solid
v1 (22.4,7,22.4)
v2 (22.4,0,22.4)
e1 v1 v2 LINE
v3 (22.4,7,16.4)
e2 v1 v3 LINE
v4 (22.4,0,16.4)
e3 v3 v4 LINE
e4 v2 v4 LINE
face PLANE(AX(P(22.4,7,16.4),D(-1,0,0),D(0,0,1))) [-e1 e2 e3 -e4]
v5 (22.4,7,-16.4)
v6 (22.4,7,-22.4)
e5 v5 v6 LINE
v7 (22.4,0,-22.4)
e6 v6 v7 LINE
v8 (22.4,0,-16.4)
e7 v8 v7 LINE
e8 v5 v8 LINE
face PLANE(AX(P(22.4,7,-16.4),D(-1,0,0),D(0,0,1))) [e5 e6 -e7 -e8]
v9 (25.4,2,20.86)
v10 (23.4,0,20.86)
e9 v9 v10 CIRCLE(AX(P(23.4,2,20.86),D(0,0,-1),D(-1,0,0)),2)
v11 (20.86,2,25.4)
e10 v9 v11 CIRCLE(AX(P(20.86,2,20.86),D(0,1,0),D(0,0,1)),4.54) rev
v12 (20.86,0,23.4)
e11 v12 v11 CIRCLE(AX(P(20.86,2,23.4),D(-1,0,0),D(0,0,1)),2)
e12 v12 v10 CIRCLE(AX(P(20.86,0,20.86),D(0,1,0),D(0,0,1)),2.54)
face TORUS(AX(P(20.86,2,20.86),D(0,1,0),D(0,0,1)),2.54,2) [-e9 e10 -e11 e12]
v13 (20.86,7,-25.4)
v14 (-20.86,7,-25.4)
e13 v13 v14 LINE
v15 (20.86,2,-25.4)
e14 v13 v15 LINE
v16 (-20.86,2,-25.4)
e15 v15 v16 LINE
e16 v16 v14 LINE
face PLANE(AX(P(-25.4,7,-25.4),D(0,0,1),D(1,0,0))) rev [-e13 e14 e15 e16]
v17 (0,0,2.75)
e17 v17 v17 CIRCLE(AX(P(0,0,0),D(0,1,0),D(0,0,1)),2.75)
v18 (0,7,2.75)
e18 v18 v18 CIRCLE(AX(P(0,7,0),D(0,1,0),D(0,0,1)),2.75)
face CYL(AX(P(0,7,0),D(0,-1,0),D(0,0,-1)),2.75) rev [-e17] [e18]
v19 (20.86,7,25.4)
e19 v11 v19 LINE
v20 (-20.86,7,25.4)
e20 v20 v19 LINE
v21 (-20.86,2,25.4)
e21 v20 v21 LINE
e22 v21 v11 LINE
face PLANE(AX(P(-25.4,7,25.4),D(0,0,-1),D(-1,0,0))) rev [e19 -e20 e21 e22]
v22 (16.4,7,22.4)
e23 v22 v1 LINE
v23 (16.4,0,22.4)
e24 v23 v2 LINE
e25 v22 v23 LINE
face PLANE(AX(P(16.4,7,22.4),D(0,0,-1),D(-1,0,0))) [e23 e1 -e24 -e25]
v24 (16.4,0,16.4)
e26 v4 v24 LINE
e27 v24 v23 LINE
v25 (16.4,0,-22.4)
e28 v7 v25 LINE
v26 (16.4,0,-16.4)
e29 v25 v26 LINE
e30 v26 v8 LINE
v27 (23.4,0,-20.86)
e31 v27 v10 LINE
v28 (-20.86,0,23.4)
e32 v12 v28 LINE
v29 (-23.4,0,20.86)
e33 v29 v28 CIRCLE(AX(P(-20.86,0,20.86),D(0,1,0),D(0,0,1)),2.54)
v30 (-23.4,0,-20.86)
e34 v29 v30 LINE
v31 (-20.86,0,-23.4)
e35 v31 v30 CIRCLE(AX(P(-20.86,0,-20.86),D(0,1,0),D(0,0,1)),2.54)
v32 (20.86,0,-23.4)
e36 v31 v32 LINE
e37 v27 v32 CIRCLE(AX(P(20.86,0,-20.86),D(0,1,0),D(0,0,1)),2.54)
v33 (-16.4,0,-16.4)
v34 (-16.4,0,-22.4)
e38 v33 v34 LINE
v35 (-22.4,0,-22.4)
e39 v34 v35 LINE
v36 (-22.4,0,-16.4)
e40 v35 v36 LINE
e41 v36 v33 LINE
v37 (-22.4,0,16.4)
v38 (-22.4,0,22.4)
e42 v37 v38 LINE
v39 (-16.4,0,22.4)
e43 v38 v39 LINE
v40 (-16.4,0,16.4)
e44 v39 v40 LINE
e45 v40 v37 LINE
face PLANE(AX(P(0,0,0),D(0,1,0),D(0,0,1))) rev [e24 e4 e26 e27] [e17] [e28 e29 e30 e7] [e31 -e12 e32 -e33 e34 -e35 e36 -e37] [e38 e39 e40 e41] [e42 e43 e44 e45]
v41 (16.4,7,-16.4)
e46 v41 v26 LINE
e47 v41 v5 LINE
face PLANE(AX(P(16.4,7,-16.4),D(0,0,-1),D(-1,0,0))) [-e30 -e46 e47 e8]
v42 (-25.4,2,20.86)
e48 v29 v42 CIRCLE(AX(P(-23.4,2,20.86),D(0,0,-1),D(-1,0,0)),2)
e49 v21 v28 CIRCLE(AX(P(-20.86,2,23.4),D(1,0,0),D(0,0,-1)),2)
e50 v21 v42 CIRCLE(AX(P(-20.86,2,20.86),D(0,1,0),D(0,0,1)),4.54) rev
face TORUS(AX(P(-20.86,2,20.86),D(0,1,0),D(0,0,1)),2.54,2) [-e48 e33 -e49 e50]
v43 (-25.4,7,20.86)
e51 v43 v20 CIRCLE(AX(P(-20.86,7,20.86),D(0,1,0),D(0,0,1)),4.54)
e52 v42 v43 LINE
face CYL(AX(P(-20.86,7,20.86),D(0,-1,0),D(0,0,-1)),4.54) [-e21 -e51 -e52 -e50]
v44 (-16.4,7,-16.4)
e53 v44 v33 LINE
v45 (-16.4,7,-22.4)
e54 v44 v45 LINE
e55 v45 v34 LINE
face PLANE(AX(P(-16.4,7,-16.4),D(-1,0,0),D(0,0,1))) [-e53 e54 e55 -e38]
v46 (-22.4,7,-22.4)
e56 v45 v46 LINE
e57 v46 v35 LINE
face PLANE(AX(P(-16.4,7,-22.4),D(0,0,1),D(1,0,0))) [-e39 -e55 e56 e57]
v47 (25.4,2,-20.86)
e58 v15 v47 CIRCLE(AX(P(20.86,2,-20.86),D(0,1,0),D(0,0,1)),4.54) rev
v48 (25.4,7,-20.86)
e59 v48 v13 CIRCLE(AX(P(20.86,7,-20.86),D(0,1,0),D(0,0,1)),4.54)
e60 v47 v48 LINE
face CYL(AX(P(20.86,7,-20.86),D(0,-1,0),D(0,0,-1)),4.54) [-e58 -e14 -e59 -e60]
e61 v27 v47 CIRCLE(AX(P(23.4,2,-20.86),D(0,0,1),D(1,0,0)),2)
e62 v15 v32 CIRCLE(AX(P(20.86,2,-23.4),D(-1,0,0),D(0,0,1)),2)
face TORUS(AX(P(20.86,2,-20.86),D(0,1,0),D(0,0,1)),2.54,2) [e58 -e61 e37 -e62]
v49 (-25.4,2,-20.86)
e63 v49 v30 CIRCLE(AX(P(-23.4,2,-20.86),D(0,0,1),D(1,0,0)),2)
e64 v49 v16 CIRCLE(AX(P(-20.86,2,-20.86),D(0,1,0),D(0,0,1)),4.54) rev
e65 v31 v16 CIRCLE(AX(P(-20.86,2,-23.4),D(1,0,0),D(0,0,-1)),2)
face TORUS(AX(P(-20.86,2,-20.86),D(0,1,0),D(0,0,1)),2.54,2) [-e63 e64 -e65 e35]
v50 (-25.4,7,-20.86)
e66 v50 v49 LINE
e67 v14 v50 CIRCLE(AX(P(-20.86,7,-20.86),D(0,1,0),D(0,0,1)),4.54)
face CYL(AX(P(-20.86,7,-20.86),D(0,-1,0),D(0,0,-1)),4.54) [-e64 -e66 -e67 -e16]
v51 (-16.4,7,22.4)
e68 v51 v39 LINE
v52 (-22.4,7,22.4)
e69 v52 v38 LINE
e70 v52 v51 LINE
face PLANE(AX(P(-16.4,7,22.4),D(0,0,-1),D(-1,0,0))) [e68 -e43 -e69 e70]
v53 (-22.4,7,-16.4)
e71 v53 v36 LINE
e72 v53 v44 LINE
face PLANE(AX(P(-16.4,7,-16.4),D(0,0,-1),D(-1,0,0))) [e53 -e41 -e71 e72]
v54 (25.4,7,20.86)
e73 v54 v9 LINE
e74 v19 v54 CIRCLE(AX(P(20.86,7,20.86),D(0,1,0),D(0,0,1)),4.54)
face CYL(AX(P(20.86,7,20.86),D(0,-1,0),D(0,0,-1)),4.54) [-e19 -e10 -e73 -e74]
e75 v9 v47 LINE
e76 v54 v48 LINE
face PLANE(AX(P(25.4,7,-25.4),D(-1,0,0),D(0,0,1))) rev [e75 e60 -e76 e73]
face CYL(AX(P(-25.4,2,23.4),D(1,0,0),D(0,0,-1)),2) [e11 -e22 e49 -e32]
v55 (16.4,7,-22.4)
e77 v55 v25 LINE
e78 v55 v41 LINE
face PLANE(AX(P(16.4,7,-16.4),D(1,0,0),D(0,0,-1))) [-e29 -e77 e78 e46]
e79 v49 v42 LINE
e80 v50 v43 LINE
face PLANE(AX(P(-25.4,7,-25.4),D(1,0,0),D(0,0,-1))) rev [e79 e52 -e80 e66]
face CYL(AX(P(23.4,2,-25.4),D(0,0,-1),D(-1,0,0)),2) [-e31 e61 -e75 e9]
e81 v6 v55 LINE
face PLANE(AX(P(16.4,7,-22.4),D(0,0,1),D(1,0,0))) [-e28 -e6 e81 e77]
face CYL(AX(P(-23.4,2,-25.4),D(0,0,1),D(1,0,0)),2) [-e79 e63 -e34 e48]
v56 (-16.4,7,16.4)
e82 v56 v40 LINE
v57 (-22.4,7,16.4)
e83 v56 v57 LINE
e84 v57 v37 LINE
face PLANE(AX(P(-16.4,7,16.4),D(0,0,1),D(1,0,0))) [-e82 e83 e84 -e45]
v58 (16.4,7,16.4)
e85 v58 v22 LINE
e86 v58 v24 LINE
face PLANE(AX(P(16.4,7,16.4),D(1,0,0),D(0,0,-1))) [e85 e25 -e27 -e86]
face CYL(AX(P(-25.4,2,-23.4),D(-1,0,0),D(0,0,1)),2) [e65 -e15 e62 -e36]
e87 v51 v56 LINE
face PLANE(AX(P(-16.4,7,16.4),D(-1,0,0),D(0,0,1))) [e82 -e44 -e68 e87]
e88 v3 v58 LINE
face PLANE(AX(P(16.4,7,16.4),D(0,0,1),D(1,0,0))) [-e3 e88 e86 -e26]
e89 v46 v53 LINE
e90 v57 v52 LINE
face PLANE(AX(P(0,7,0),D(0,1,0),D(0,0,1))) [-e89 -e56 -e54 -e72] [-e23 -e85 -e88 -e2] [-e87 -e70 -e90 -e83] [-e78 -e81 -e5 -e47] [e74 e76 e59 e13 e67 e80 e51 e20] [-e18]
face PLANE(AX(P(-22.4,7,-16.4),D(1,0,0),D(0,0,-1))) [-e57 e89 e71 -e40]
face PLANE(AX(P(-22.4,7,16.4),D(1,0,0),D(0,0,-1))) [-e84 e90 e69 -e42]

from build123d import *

# Parameters (mm, degrees)
SKETCH1_W           = 50.8
SKETCH1_H           = 50.8
SKETCH1_R           = 2.75
SKETCH1_W_2         = 6
SKETCH1_H_2         = 6
BOSS_EXTRUDE1_DEPTH = 7
FILLET1_R           = 2
FILLET2_R           = 4.54


with BuildPart() as part:
    # Sketch1 → Boss-Extrude1 (new body)
    with BuildSketch(Plane(origin=(0, 0, 0), x_dir=(1, 0, 0), z_dir=(0, 1, 0))):
        Rectangle(SKETCH1_W, SKETCH1_H)
        with Locations(Location((0, 0, 0), (0, 0, 270))):
            Circle(SKETCH1_R, mode=Mode.SUBTRACT)
        with Locations((-19.4, 19.4)):
            Rectangle(SKETCH1_W_2, SKETCH1_H_2, mode=Mode.SUBTRACT)
        with Locations((19.4, 19.4)):
            Rectangle(SKETCH1_W_2, SKETCH1_H_2, mode=Mode.SUBTRACT)
        with Locations((-19.4, -19.4)):
            Rectangle(SKETCH1_W_2, SKETCH1_H_2, mode=Mode.SUBTRACT)
        with Locations((19.4, -19.4)):
            Rectangle(SKETCH1_W_2, SKETCH1_H_2, mode=Mode.SUBTRACT)
    extrude(amount=BOSS_EXTRUDE1_DEPTH)

    # Fillet1
    fillet1_edges = [part.edges().sort_by_distance(p)[0] for p in [
        (0, 0, 25.4),
        (-25.4, 0, 0),
        (0, 0, -25.4),
        (25.4, 0, 0),
    ]]
    fillet(fillet1_edges, radius=FILLET1_R)

    # Fillet2
    # the kernel refuses this fillet: 4.54 mm, written as the material it takes off along each edge
    with BuildSketch(Plane(origin=(20.86, 0, -20.86), x_dir=(0, 0, -1), z_dir=(-1, 0, 0))) as fillet2_piece_1:
        with BuildLine():
            CenterArc((2.54, -2), 2, 0, 90)
            Line((4.54, -2), (4.54, 0))
            Line((4.54, 0), (2.54, 0))
        make_face()
    revolve(axis=Axis((20.86, 0, -20.86), (0, -1, 0)), revolution_arc=90, mode=Mode.SUBTRACT)
    with BuildSketch(Plane(origin=(20.86, 0, 20.86), x_dir=(1, 0, 0), z_dir=(0, 0, -1))) as fillet2_piece_2:
        with BuildLine():
            CenterArc((2.54, -2), 2, 0, 90)
            Line((4.54, -2), (4.54, 0))
            Line((4.54, 0), (2.54, 0))
        make_face()
    revolve(axis=Axis((20.86, 0, 20.86), (0, -1, 0)), revolution_arc=90, mode=Mode.SUBTRACT)
    with BuildSketch(Plane(origin=(-20.86, 0, -20.86), x_dir=(-1, 0, 0), z_dir=(0, 0, 1))) as fillet2_piece_3:
        with BuildLine():
            CenterArc((2.54, -2), 2, 0, 90)
            Line((4.54, -2), (4.54, 0))
            Line((4.54, 0), (2.54, 0))
        make_face()
    revolve(axis=Axis((-20.86, 0, -20.86), (0, -1, 0)), revolution_arc=90, mode=Mode.SUBTRACT)
    with BuildSketch(Plane(origin=(-20.86, 0, 20.86), x_dir=(0, 0, 1), z_dir=(1, 0, 0))) as fillet2_piece_4:
        with BuildLine():
            CenterArc((2.54, -2), 2, 0, 90)
            Line((4.54, -2), (4.54, 0))
            Line((4.54, 0), (2.54, 0))
        make_face()
    revolve(axis=Axis((-20.86, 0, 20.86), (0, -1, 0)), revolution_arc=90, mode=Mode.SUBTRACT)
    with BuildSketch(Plane(origin=(25.4, 0, 25.4), x_dir=(0, 0, -1), z_dir=(0, 1, 0)), Plane(origin=(25.4, 0, -25.4), x_dir=(-1, 0, 0), z_dir=(0, 1, 0))) as fillet2_piece_5:
        with BuildLine():
            CenterArc((FILLET2_R, FILLET2_R), FILLET2_R, 180, 90)
            Line((0, FILLET2_R), (0, 0))
            Line((0, 0), (FILLET2_R, 0))
        make_face()
    extrude(amount=18.35, mode=Mode.SUBTRACT)
    with BuildSketch(Plane(origin=(-25.4, 0, 25.4), x_dir=(0, 0, -1), z_dir=(0, 1, 0)), Plane(origin=(-25.4, 0, -25.4), x_dir=(1, 0, 0), z_dir=(0, 1, 0))) as fillet2_piece_6:
        with BuildLine():
            CenterArc((FILLET2_R, -FILLET2_R), FILLET2_R, 90, 90)
            Line((0, -FILLET2_R), (0, 0))
            Line((0, 0), (FILLET2_R, 0))
        make_face()
    extrude(amount=18.35, mode=Mode.SUBTRACT)


solid = part.part
